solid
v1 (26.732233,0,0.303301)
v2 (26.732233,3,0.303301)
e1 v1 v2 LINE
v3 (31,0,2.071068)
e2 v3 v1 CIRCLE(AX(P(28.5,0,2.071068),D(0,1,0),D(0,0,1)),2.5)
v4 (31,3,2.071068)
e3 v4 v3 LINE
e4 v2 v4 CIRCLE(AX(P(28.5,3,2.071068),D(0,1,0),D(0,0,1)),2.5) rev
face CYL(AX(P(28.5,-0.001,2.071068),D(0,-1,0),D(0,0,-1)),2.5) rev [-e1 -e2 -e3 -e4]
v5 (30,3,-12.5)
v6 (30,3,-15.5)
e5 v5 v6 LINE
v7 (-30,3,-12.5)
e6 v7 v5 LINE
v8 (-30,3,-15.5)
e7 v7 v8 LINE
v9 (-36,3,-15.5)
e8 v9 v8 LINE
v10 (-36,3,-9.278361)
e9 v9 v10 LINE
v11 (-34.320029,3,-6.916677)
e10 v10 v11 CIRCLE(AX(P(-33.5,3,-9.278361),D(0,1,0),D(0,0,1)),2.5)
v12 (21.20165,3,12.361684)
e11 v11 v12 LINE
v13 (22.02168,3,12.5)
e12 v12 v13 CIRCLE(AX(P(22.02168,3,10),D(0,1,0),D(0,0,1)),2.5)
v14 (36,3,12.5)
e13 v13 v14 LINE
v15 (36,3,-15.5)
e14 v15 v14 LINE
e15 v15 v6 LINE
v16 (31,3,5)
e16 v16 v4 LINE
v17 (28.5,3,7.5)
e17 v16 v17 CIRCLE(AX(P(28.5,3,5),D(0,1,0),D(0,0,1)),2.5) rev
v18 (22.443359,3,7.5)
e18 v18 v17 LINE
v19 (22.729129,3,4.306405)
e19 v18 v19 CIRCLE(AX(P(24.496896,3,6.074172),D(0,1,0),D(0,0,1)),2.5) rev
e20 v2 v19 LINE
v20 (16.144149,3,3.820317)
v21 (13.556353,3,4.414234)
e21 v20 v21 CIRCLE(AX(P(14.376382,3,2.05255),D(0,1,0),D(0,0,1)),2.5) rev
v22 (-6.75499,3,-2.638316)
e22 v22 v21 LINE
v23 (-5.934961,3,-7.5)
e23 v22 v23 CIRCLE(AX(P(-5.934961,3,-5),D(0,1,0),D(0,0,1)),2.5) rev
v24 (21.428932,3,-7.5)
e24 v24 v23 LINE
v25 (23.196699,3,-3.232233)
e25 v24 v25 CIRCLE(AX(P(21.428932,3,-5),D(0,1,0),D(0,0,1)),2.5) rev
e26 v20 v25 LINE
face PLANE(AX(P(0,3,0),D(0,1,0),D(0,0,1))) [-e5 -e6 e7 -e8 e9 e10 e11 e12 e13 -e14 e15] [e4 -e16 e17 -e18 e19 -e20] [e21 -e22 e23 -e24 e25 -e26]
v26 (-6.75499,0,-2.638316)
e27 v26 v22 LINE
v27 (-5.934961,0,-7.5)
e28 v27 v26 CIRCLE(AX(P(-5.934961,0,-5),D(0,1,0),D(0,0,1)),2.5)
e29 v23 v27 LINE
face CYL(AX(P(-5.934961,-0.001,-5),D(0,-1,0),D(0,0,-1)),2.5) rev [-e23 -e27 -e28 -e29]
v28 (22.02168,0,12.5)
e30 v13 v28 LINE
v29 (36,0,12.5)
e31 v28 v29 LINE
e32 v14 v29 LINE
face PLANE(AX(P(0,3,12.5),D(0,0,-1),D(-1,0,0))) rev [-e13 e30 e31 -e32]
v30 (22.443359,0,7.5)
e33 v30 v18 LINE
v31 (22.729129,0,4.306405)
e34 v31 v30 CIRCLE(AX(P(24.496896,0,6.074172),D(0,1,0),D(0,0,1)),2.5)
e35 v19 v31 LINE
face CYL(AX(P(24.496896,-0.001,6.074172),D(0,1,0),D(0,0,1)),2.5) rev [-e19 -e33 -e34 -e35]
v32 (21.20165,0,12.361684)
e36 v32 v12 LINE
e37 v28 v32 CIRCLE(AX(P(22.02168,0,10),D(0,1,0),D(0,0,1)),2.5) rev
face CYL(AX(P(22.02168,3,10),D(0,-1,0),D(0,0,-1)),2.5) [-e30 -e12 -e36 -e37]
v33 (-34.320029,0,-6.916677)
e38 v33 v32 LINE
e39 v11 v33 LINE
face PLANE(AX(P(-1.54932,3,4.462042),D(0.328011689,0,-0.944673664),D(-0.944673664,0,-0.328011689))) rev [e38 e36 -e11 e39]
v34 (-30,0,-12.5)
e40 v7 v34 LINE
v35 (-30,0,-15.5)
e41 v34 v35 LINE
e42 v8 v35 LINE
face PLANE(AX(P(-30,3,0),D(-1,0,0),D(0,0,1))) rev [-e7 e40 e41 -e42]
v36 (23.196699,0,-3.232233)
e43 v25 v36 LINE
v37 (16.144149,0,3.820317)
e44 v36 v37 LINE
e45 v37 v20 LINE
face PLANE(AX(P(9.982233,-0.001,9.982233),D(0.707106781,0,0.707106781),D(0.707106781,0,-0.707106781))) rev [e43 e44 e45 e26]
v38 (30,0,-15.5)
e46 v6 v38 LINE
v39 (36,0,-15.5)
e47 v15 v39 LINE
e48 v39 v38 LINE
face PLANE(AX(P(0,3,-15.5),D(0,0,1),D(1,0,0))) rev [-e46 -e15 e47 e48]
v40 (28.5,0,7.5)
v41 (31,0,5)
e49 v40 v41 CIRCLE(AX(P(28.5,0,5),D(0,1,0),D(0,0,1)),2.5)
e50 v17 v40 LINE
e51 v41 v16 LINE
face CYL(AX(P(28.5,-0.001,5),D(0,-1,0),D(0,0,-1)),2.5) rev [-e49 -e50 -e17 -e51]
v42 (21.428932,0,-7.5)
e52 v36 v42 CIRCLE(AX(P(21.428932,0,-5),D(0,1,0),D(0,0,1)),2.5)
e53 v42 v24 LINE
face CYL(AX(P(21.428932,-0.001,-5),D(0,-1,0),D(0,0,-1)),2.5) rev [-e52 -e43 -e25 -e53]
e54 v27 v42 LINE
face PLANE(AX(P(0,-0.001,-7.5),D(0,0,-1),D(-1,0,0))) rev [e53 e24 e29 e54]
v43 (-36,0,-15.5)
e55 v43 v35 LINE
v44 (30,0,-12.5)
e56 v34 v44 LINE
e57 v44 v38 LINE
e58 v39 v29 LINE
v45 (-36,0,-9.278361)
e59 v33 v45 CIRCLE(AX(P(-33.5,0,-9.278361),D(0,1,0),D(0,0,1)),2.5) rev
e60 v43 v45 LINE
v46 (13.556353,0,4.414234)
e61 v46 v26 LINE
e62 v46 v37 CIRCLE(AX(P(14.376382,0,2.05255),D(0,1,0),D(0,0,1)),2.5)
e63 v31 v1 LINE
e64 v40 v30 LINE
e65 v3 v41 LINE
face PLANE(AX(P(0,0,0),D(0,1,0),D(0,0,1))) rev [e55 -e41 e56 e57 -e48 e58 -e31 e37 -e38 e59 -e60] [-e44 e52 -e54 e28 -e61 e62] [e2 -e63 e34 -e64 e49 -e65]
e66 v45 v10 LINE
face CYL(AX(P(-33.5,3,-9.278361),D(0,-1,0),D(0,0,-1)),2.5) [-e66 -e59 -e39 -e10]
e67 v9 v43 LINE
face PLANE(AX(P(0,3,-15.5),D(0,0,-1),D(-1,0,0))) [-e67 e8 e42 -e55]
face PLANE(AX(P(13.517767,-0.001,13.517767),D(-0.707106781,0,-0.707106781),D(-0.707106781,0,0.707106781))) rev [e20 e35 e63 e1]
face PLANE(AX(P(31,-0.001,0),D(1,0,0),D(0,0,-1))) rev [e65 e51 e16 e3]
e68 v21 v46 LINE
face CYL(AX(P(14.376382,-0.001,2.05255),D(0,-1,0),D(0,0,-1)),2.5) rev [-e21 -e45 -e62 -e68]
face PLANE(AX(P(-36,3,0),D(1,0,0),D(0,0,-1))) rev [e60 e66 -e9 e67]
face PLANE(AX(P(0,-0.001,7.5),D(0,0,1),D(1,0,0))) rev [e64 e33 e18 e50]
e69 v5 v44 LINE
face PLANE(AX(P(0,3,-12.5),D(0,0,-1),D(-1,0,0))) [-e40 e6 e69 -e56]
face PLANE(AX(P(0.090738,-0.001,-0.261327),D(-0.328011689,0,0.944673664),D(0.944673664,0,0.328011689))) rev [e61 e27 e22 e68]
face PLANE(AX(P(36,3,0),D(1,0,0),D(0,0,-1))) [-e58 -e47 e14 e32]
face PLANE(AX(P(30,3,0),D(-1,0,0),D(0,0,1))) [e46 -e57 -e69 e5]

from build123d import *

# Parameters (mm, degrees)
SKETCH1_W           = 6
SKETCH1_H           = 3
BOSS_EXTRUDE1_DEPTH = 3
CUT_EXTRUDE1_REACH  = 41.31
FILLET1_R           = 2.5


with BuildPart() as part:
    # Sketch1 → Boss-Extrude1 (new body)
    with BuildSketch(Plane(origin=(0, 0, 0), x_dir=(1, 0, 0), z_dir=(0, 1, 0))):
        Polygon((-36, 12.5), (-36, 7.5), (21.6, -12.5), (36, -12.5), (36, 12.5), (30, 12.5), (-30, 12.5), align=None)
        with Locations((-33, 14)):
            Rectangle(SKETCH1_W, SKETCH1_H)
        with Locations((33, 14)):
            Rectangle(SKETCH1_W, SKETCH1_H)
    extrude(amount=BOSS_EXTRUDE1_DEPTH)

    # Sketch2 → Cut-Extrude1 (cut, up to next)
    with BuildSketch(Plane(origin=(0, 3, 0), x_dir=(1, 0, 0), z_dir=(0, 1, 0)), mode=Mode.PRIVATE) as cut_extrude1_sk1:
        Polygon((-20.75664079, 7.5), (15.036345763, -4.928120331), (27.464466094, 7.5), align=None)
    cut_extrude1_tool1 = extrude(cut_extrude1_sk1.sketch, amount=-CUT_EXTRUDE1_REACH, mode=Mode.PRIVATE) & part.part
    # Sketch2 → Cut-Extrude1 (cut, up to next)
    with BuildSketch(Plane(origin=(0, 3, 0), x_dir=(1, 0, 0), z_dir=(0, 1, 0)), mode=Mode.PRIVATE) as cut_extrude1_sk2:
        Polygon((31, 3.964466094), (20.284973417, -6.750560489), (22.44335921, -7.5), (31, -7.5), align=None)
    cut_extrude1_tool2 = extrude(cut_extrude1_sk2.sketch, amount=-CUT_EXTRUDE1_REACH, mode=Mode.PRIVATE) & part.part
    add(cut_extrude1_tool1.solids().sort_by_distance((7.248057, 3, -3.357293))[0], mode=Mode.SUBTRACT)
    add(cut_extrude1_tool2.solids().sort_by_distance((27.286818, 3, 3.618293))[0], mode=Mode.SUBTRACT)

    # Fillet1
    # the kernel refuses this fillet: 2.5 mm, written as the material it adds along each edge
    with BuildSketch(Plane(origin=(20.284973417, 3, 6.750560489), x_dir=(0.7071067811865467, 0, -0.7071067811865482), z_dir=(0, -1, 0))) as fillet1_piece_1:
        with BuildLine():
            CenterArc((3.456558168, 2.5), FILLET1_R, 190.226667661, 79.773332339)
            Line((0.99627547, 2.056142991), (0, 0))
            Line((0, 0), (3.456558168, 0))
        make_face()
    extrude(amount=3)
    with BuildSketch(Plane(origin=(31, 3, -3.964466094), x_dir=(0, 0, 1), z_dir=(0, -1, 0)), Plane(origin=(27.464466094, 3, -7.5), x_dir=(-0.7071067811865461, 0, 0.707106781186549), z_dir=(0, -1, 0))) as fillet1_piece_2:
        with BuildLine():
            CenterArc((FILLET1_R * 2.41421356237, FILLET1_R), FILLET1_R, 135, 135)
            Line((FILLET1_R * 1.70710678119, FILLET1_R * 1.70710678119), (0, 0))
            Line((0, 0), (FILLET1_R * 2.41421356237, 0))
        make_face()
    extrude(amount=3)
    with BuildSketch(Plane(origin=(31, 3, 7.5), x_dir=(0, 0, -1), z_dir=(0, -1, 0))) as fillet1_piece_3:
        with BuildLine():
            CenterArc((FILLET1_R, -FILLET1_R), FILLET1_R, 90, 90)
            Line((0, -FILLET1_R), (0, 0))
            Line((0, 0), (FILLET1_R, 0))
        make_face()
    extrude(amount=3)
    with BuildSketch(Plane(origin=(-20.75664079, 3, -7.5), x_dir=(0.9446736642347862, 0, 0.3280116889704124), z_dir=(0, -1, 0))) as fillet1_piece_4:
        with BuildLine():
            CenterArc((FILLET1_R * 5.92867184197, -FILLET1_R), FILLET1_R, 90, 160.851862542)
            Line((FILLET1_R * 5.600660153, -FILLET1_R * 1.94467366423), (0, 0))
            Line((0, 0), (FILLET1_R * 5.92867184197, 0))
        make_face()
    extrude(amount=3)
    with BuildSketch(Plane(origin=(15.036345763, 3, 4.928120331), x_dir=(-0.9446736642347863, 0, -0.3280116889704122), z_dir=(0, -1, 0))) as fillet1_piece_5:
        with BuildLine():
            CenterArc((FILLET1_R * 0.626668316014, FILLET1_R), FILLET1_R, 205.851862542, 64.148137458)
            Line((-FILLET1_R * 0.273256127554, FILLET1_R * 0.563954135591), (0, 0))
            Line((0, 0), (FILLET1_R * 0.626668316014, 0))
        make_face()
    extrude(amount=3)
    # the kernel refuses this fillet: 2.5 mm, written as the material it takes off along each edge
    with BuildSketch(Plane(origin=(21.6, -1.054199012, 12.5), x_dir=(-0.9446736642347879, 0, -0.32801168897040733), z_dir=(0, 1, 0))) as fillet1_2_piece_1:
        with BuildLine():
            CenterArc((FILLET1_R * 0.168671841967, -FILLET1_R), FILLET1_R, 90, 19.148137458)
            Line((-FILLET1_R * 0.159339847004, -FILLET1_R * 0.0553263357652), (0, 0))
            Line((0, 0), (FILLET1_R * 0.168671841967, 0))
        make_face()
    extrude(amount=5.108398025, mode=Mode.SUBTRACT)
    with BuildSketch(Plane(origin=(-36, -4.445902435, -7.5), x_dir=(0, 0, -1), z_dir=(0, 1, 0))) as fillet1_2_piece_2:
        with BuildLine():
            CenterArc((FILLET1_R * 0.711344389572, -FILLET1_R), FILLET1_R, 90, 70.851862542)
            Line((-FILLET1_R * 0.233329274663, -FILLET1_R * 0.67198831103), (0, 0))
            Line((0, 0), (FILLET1_R * 0.711344389572, 0))
        make_face()
    extrude(amount=11.89180487, mode=Mode.SUBTRACT)


solid = part.part
